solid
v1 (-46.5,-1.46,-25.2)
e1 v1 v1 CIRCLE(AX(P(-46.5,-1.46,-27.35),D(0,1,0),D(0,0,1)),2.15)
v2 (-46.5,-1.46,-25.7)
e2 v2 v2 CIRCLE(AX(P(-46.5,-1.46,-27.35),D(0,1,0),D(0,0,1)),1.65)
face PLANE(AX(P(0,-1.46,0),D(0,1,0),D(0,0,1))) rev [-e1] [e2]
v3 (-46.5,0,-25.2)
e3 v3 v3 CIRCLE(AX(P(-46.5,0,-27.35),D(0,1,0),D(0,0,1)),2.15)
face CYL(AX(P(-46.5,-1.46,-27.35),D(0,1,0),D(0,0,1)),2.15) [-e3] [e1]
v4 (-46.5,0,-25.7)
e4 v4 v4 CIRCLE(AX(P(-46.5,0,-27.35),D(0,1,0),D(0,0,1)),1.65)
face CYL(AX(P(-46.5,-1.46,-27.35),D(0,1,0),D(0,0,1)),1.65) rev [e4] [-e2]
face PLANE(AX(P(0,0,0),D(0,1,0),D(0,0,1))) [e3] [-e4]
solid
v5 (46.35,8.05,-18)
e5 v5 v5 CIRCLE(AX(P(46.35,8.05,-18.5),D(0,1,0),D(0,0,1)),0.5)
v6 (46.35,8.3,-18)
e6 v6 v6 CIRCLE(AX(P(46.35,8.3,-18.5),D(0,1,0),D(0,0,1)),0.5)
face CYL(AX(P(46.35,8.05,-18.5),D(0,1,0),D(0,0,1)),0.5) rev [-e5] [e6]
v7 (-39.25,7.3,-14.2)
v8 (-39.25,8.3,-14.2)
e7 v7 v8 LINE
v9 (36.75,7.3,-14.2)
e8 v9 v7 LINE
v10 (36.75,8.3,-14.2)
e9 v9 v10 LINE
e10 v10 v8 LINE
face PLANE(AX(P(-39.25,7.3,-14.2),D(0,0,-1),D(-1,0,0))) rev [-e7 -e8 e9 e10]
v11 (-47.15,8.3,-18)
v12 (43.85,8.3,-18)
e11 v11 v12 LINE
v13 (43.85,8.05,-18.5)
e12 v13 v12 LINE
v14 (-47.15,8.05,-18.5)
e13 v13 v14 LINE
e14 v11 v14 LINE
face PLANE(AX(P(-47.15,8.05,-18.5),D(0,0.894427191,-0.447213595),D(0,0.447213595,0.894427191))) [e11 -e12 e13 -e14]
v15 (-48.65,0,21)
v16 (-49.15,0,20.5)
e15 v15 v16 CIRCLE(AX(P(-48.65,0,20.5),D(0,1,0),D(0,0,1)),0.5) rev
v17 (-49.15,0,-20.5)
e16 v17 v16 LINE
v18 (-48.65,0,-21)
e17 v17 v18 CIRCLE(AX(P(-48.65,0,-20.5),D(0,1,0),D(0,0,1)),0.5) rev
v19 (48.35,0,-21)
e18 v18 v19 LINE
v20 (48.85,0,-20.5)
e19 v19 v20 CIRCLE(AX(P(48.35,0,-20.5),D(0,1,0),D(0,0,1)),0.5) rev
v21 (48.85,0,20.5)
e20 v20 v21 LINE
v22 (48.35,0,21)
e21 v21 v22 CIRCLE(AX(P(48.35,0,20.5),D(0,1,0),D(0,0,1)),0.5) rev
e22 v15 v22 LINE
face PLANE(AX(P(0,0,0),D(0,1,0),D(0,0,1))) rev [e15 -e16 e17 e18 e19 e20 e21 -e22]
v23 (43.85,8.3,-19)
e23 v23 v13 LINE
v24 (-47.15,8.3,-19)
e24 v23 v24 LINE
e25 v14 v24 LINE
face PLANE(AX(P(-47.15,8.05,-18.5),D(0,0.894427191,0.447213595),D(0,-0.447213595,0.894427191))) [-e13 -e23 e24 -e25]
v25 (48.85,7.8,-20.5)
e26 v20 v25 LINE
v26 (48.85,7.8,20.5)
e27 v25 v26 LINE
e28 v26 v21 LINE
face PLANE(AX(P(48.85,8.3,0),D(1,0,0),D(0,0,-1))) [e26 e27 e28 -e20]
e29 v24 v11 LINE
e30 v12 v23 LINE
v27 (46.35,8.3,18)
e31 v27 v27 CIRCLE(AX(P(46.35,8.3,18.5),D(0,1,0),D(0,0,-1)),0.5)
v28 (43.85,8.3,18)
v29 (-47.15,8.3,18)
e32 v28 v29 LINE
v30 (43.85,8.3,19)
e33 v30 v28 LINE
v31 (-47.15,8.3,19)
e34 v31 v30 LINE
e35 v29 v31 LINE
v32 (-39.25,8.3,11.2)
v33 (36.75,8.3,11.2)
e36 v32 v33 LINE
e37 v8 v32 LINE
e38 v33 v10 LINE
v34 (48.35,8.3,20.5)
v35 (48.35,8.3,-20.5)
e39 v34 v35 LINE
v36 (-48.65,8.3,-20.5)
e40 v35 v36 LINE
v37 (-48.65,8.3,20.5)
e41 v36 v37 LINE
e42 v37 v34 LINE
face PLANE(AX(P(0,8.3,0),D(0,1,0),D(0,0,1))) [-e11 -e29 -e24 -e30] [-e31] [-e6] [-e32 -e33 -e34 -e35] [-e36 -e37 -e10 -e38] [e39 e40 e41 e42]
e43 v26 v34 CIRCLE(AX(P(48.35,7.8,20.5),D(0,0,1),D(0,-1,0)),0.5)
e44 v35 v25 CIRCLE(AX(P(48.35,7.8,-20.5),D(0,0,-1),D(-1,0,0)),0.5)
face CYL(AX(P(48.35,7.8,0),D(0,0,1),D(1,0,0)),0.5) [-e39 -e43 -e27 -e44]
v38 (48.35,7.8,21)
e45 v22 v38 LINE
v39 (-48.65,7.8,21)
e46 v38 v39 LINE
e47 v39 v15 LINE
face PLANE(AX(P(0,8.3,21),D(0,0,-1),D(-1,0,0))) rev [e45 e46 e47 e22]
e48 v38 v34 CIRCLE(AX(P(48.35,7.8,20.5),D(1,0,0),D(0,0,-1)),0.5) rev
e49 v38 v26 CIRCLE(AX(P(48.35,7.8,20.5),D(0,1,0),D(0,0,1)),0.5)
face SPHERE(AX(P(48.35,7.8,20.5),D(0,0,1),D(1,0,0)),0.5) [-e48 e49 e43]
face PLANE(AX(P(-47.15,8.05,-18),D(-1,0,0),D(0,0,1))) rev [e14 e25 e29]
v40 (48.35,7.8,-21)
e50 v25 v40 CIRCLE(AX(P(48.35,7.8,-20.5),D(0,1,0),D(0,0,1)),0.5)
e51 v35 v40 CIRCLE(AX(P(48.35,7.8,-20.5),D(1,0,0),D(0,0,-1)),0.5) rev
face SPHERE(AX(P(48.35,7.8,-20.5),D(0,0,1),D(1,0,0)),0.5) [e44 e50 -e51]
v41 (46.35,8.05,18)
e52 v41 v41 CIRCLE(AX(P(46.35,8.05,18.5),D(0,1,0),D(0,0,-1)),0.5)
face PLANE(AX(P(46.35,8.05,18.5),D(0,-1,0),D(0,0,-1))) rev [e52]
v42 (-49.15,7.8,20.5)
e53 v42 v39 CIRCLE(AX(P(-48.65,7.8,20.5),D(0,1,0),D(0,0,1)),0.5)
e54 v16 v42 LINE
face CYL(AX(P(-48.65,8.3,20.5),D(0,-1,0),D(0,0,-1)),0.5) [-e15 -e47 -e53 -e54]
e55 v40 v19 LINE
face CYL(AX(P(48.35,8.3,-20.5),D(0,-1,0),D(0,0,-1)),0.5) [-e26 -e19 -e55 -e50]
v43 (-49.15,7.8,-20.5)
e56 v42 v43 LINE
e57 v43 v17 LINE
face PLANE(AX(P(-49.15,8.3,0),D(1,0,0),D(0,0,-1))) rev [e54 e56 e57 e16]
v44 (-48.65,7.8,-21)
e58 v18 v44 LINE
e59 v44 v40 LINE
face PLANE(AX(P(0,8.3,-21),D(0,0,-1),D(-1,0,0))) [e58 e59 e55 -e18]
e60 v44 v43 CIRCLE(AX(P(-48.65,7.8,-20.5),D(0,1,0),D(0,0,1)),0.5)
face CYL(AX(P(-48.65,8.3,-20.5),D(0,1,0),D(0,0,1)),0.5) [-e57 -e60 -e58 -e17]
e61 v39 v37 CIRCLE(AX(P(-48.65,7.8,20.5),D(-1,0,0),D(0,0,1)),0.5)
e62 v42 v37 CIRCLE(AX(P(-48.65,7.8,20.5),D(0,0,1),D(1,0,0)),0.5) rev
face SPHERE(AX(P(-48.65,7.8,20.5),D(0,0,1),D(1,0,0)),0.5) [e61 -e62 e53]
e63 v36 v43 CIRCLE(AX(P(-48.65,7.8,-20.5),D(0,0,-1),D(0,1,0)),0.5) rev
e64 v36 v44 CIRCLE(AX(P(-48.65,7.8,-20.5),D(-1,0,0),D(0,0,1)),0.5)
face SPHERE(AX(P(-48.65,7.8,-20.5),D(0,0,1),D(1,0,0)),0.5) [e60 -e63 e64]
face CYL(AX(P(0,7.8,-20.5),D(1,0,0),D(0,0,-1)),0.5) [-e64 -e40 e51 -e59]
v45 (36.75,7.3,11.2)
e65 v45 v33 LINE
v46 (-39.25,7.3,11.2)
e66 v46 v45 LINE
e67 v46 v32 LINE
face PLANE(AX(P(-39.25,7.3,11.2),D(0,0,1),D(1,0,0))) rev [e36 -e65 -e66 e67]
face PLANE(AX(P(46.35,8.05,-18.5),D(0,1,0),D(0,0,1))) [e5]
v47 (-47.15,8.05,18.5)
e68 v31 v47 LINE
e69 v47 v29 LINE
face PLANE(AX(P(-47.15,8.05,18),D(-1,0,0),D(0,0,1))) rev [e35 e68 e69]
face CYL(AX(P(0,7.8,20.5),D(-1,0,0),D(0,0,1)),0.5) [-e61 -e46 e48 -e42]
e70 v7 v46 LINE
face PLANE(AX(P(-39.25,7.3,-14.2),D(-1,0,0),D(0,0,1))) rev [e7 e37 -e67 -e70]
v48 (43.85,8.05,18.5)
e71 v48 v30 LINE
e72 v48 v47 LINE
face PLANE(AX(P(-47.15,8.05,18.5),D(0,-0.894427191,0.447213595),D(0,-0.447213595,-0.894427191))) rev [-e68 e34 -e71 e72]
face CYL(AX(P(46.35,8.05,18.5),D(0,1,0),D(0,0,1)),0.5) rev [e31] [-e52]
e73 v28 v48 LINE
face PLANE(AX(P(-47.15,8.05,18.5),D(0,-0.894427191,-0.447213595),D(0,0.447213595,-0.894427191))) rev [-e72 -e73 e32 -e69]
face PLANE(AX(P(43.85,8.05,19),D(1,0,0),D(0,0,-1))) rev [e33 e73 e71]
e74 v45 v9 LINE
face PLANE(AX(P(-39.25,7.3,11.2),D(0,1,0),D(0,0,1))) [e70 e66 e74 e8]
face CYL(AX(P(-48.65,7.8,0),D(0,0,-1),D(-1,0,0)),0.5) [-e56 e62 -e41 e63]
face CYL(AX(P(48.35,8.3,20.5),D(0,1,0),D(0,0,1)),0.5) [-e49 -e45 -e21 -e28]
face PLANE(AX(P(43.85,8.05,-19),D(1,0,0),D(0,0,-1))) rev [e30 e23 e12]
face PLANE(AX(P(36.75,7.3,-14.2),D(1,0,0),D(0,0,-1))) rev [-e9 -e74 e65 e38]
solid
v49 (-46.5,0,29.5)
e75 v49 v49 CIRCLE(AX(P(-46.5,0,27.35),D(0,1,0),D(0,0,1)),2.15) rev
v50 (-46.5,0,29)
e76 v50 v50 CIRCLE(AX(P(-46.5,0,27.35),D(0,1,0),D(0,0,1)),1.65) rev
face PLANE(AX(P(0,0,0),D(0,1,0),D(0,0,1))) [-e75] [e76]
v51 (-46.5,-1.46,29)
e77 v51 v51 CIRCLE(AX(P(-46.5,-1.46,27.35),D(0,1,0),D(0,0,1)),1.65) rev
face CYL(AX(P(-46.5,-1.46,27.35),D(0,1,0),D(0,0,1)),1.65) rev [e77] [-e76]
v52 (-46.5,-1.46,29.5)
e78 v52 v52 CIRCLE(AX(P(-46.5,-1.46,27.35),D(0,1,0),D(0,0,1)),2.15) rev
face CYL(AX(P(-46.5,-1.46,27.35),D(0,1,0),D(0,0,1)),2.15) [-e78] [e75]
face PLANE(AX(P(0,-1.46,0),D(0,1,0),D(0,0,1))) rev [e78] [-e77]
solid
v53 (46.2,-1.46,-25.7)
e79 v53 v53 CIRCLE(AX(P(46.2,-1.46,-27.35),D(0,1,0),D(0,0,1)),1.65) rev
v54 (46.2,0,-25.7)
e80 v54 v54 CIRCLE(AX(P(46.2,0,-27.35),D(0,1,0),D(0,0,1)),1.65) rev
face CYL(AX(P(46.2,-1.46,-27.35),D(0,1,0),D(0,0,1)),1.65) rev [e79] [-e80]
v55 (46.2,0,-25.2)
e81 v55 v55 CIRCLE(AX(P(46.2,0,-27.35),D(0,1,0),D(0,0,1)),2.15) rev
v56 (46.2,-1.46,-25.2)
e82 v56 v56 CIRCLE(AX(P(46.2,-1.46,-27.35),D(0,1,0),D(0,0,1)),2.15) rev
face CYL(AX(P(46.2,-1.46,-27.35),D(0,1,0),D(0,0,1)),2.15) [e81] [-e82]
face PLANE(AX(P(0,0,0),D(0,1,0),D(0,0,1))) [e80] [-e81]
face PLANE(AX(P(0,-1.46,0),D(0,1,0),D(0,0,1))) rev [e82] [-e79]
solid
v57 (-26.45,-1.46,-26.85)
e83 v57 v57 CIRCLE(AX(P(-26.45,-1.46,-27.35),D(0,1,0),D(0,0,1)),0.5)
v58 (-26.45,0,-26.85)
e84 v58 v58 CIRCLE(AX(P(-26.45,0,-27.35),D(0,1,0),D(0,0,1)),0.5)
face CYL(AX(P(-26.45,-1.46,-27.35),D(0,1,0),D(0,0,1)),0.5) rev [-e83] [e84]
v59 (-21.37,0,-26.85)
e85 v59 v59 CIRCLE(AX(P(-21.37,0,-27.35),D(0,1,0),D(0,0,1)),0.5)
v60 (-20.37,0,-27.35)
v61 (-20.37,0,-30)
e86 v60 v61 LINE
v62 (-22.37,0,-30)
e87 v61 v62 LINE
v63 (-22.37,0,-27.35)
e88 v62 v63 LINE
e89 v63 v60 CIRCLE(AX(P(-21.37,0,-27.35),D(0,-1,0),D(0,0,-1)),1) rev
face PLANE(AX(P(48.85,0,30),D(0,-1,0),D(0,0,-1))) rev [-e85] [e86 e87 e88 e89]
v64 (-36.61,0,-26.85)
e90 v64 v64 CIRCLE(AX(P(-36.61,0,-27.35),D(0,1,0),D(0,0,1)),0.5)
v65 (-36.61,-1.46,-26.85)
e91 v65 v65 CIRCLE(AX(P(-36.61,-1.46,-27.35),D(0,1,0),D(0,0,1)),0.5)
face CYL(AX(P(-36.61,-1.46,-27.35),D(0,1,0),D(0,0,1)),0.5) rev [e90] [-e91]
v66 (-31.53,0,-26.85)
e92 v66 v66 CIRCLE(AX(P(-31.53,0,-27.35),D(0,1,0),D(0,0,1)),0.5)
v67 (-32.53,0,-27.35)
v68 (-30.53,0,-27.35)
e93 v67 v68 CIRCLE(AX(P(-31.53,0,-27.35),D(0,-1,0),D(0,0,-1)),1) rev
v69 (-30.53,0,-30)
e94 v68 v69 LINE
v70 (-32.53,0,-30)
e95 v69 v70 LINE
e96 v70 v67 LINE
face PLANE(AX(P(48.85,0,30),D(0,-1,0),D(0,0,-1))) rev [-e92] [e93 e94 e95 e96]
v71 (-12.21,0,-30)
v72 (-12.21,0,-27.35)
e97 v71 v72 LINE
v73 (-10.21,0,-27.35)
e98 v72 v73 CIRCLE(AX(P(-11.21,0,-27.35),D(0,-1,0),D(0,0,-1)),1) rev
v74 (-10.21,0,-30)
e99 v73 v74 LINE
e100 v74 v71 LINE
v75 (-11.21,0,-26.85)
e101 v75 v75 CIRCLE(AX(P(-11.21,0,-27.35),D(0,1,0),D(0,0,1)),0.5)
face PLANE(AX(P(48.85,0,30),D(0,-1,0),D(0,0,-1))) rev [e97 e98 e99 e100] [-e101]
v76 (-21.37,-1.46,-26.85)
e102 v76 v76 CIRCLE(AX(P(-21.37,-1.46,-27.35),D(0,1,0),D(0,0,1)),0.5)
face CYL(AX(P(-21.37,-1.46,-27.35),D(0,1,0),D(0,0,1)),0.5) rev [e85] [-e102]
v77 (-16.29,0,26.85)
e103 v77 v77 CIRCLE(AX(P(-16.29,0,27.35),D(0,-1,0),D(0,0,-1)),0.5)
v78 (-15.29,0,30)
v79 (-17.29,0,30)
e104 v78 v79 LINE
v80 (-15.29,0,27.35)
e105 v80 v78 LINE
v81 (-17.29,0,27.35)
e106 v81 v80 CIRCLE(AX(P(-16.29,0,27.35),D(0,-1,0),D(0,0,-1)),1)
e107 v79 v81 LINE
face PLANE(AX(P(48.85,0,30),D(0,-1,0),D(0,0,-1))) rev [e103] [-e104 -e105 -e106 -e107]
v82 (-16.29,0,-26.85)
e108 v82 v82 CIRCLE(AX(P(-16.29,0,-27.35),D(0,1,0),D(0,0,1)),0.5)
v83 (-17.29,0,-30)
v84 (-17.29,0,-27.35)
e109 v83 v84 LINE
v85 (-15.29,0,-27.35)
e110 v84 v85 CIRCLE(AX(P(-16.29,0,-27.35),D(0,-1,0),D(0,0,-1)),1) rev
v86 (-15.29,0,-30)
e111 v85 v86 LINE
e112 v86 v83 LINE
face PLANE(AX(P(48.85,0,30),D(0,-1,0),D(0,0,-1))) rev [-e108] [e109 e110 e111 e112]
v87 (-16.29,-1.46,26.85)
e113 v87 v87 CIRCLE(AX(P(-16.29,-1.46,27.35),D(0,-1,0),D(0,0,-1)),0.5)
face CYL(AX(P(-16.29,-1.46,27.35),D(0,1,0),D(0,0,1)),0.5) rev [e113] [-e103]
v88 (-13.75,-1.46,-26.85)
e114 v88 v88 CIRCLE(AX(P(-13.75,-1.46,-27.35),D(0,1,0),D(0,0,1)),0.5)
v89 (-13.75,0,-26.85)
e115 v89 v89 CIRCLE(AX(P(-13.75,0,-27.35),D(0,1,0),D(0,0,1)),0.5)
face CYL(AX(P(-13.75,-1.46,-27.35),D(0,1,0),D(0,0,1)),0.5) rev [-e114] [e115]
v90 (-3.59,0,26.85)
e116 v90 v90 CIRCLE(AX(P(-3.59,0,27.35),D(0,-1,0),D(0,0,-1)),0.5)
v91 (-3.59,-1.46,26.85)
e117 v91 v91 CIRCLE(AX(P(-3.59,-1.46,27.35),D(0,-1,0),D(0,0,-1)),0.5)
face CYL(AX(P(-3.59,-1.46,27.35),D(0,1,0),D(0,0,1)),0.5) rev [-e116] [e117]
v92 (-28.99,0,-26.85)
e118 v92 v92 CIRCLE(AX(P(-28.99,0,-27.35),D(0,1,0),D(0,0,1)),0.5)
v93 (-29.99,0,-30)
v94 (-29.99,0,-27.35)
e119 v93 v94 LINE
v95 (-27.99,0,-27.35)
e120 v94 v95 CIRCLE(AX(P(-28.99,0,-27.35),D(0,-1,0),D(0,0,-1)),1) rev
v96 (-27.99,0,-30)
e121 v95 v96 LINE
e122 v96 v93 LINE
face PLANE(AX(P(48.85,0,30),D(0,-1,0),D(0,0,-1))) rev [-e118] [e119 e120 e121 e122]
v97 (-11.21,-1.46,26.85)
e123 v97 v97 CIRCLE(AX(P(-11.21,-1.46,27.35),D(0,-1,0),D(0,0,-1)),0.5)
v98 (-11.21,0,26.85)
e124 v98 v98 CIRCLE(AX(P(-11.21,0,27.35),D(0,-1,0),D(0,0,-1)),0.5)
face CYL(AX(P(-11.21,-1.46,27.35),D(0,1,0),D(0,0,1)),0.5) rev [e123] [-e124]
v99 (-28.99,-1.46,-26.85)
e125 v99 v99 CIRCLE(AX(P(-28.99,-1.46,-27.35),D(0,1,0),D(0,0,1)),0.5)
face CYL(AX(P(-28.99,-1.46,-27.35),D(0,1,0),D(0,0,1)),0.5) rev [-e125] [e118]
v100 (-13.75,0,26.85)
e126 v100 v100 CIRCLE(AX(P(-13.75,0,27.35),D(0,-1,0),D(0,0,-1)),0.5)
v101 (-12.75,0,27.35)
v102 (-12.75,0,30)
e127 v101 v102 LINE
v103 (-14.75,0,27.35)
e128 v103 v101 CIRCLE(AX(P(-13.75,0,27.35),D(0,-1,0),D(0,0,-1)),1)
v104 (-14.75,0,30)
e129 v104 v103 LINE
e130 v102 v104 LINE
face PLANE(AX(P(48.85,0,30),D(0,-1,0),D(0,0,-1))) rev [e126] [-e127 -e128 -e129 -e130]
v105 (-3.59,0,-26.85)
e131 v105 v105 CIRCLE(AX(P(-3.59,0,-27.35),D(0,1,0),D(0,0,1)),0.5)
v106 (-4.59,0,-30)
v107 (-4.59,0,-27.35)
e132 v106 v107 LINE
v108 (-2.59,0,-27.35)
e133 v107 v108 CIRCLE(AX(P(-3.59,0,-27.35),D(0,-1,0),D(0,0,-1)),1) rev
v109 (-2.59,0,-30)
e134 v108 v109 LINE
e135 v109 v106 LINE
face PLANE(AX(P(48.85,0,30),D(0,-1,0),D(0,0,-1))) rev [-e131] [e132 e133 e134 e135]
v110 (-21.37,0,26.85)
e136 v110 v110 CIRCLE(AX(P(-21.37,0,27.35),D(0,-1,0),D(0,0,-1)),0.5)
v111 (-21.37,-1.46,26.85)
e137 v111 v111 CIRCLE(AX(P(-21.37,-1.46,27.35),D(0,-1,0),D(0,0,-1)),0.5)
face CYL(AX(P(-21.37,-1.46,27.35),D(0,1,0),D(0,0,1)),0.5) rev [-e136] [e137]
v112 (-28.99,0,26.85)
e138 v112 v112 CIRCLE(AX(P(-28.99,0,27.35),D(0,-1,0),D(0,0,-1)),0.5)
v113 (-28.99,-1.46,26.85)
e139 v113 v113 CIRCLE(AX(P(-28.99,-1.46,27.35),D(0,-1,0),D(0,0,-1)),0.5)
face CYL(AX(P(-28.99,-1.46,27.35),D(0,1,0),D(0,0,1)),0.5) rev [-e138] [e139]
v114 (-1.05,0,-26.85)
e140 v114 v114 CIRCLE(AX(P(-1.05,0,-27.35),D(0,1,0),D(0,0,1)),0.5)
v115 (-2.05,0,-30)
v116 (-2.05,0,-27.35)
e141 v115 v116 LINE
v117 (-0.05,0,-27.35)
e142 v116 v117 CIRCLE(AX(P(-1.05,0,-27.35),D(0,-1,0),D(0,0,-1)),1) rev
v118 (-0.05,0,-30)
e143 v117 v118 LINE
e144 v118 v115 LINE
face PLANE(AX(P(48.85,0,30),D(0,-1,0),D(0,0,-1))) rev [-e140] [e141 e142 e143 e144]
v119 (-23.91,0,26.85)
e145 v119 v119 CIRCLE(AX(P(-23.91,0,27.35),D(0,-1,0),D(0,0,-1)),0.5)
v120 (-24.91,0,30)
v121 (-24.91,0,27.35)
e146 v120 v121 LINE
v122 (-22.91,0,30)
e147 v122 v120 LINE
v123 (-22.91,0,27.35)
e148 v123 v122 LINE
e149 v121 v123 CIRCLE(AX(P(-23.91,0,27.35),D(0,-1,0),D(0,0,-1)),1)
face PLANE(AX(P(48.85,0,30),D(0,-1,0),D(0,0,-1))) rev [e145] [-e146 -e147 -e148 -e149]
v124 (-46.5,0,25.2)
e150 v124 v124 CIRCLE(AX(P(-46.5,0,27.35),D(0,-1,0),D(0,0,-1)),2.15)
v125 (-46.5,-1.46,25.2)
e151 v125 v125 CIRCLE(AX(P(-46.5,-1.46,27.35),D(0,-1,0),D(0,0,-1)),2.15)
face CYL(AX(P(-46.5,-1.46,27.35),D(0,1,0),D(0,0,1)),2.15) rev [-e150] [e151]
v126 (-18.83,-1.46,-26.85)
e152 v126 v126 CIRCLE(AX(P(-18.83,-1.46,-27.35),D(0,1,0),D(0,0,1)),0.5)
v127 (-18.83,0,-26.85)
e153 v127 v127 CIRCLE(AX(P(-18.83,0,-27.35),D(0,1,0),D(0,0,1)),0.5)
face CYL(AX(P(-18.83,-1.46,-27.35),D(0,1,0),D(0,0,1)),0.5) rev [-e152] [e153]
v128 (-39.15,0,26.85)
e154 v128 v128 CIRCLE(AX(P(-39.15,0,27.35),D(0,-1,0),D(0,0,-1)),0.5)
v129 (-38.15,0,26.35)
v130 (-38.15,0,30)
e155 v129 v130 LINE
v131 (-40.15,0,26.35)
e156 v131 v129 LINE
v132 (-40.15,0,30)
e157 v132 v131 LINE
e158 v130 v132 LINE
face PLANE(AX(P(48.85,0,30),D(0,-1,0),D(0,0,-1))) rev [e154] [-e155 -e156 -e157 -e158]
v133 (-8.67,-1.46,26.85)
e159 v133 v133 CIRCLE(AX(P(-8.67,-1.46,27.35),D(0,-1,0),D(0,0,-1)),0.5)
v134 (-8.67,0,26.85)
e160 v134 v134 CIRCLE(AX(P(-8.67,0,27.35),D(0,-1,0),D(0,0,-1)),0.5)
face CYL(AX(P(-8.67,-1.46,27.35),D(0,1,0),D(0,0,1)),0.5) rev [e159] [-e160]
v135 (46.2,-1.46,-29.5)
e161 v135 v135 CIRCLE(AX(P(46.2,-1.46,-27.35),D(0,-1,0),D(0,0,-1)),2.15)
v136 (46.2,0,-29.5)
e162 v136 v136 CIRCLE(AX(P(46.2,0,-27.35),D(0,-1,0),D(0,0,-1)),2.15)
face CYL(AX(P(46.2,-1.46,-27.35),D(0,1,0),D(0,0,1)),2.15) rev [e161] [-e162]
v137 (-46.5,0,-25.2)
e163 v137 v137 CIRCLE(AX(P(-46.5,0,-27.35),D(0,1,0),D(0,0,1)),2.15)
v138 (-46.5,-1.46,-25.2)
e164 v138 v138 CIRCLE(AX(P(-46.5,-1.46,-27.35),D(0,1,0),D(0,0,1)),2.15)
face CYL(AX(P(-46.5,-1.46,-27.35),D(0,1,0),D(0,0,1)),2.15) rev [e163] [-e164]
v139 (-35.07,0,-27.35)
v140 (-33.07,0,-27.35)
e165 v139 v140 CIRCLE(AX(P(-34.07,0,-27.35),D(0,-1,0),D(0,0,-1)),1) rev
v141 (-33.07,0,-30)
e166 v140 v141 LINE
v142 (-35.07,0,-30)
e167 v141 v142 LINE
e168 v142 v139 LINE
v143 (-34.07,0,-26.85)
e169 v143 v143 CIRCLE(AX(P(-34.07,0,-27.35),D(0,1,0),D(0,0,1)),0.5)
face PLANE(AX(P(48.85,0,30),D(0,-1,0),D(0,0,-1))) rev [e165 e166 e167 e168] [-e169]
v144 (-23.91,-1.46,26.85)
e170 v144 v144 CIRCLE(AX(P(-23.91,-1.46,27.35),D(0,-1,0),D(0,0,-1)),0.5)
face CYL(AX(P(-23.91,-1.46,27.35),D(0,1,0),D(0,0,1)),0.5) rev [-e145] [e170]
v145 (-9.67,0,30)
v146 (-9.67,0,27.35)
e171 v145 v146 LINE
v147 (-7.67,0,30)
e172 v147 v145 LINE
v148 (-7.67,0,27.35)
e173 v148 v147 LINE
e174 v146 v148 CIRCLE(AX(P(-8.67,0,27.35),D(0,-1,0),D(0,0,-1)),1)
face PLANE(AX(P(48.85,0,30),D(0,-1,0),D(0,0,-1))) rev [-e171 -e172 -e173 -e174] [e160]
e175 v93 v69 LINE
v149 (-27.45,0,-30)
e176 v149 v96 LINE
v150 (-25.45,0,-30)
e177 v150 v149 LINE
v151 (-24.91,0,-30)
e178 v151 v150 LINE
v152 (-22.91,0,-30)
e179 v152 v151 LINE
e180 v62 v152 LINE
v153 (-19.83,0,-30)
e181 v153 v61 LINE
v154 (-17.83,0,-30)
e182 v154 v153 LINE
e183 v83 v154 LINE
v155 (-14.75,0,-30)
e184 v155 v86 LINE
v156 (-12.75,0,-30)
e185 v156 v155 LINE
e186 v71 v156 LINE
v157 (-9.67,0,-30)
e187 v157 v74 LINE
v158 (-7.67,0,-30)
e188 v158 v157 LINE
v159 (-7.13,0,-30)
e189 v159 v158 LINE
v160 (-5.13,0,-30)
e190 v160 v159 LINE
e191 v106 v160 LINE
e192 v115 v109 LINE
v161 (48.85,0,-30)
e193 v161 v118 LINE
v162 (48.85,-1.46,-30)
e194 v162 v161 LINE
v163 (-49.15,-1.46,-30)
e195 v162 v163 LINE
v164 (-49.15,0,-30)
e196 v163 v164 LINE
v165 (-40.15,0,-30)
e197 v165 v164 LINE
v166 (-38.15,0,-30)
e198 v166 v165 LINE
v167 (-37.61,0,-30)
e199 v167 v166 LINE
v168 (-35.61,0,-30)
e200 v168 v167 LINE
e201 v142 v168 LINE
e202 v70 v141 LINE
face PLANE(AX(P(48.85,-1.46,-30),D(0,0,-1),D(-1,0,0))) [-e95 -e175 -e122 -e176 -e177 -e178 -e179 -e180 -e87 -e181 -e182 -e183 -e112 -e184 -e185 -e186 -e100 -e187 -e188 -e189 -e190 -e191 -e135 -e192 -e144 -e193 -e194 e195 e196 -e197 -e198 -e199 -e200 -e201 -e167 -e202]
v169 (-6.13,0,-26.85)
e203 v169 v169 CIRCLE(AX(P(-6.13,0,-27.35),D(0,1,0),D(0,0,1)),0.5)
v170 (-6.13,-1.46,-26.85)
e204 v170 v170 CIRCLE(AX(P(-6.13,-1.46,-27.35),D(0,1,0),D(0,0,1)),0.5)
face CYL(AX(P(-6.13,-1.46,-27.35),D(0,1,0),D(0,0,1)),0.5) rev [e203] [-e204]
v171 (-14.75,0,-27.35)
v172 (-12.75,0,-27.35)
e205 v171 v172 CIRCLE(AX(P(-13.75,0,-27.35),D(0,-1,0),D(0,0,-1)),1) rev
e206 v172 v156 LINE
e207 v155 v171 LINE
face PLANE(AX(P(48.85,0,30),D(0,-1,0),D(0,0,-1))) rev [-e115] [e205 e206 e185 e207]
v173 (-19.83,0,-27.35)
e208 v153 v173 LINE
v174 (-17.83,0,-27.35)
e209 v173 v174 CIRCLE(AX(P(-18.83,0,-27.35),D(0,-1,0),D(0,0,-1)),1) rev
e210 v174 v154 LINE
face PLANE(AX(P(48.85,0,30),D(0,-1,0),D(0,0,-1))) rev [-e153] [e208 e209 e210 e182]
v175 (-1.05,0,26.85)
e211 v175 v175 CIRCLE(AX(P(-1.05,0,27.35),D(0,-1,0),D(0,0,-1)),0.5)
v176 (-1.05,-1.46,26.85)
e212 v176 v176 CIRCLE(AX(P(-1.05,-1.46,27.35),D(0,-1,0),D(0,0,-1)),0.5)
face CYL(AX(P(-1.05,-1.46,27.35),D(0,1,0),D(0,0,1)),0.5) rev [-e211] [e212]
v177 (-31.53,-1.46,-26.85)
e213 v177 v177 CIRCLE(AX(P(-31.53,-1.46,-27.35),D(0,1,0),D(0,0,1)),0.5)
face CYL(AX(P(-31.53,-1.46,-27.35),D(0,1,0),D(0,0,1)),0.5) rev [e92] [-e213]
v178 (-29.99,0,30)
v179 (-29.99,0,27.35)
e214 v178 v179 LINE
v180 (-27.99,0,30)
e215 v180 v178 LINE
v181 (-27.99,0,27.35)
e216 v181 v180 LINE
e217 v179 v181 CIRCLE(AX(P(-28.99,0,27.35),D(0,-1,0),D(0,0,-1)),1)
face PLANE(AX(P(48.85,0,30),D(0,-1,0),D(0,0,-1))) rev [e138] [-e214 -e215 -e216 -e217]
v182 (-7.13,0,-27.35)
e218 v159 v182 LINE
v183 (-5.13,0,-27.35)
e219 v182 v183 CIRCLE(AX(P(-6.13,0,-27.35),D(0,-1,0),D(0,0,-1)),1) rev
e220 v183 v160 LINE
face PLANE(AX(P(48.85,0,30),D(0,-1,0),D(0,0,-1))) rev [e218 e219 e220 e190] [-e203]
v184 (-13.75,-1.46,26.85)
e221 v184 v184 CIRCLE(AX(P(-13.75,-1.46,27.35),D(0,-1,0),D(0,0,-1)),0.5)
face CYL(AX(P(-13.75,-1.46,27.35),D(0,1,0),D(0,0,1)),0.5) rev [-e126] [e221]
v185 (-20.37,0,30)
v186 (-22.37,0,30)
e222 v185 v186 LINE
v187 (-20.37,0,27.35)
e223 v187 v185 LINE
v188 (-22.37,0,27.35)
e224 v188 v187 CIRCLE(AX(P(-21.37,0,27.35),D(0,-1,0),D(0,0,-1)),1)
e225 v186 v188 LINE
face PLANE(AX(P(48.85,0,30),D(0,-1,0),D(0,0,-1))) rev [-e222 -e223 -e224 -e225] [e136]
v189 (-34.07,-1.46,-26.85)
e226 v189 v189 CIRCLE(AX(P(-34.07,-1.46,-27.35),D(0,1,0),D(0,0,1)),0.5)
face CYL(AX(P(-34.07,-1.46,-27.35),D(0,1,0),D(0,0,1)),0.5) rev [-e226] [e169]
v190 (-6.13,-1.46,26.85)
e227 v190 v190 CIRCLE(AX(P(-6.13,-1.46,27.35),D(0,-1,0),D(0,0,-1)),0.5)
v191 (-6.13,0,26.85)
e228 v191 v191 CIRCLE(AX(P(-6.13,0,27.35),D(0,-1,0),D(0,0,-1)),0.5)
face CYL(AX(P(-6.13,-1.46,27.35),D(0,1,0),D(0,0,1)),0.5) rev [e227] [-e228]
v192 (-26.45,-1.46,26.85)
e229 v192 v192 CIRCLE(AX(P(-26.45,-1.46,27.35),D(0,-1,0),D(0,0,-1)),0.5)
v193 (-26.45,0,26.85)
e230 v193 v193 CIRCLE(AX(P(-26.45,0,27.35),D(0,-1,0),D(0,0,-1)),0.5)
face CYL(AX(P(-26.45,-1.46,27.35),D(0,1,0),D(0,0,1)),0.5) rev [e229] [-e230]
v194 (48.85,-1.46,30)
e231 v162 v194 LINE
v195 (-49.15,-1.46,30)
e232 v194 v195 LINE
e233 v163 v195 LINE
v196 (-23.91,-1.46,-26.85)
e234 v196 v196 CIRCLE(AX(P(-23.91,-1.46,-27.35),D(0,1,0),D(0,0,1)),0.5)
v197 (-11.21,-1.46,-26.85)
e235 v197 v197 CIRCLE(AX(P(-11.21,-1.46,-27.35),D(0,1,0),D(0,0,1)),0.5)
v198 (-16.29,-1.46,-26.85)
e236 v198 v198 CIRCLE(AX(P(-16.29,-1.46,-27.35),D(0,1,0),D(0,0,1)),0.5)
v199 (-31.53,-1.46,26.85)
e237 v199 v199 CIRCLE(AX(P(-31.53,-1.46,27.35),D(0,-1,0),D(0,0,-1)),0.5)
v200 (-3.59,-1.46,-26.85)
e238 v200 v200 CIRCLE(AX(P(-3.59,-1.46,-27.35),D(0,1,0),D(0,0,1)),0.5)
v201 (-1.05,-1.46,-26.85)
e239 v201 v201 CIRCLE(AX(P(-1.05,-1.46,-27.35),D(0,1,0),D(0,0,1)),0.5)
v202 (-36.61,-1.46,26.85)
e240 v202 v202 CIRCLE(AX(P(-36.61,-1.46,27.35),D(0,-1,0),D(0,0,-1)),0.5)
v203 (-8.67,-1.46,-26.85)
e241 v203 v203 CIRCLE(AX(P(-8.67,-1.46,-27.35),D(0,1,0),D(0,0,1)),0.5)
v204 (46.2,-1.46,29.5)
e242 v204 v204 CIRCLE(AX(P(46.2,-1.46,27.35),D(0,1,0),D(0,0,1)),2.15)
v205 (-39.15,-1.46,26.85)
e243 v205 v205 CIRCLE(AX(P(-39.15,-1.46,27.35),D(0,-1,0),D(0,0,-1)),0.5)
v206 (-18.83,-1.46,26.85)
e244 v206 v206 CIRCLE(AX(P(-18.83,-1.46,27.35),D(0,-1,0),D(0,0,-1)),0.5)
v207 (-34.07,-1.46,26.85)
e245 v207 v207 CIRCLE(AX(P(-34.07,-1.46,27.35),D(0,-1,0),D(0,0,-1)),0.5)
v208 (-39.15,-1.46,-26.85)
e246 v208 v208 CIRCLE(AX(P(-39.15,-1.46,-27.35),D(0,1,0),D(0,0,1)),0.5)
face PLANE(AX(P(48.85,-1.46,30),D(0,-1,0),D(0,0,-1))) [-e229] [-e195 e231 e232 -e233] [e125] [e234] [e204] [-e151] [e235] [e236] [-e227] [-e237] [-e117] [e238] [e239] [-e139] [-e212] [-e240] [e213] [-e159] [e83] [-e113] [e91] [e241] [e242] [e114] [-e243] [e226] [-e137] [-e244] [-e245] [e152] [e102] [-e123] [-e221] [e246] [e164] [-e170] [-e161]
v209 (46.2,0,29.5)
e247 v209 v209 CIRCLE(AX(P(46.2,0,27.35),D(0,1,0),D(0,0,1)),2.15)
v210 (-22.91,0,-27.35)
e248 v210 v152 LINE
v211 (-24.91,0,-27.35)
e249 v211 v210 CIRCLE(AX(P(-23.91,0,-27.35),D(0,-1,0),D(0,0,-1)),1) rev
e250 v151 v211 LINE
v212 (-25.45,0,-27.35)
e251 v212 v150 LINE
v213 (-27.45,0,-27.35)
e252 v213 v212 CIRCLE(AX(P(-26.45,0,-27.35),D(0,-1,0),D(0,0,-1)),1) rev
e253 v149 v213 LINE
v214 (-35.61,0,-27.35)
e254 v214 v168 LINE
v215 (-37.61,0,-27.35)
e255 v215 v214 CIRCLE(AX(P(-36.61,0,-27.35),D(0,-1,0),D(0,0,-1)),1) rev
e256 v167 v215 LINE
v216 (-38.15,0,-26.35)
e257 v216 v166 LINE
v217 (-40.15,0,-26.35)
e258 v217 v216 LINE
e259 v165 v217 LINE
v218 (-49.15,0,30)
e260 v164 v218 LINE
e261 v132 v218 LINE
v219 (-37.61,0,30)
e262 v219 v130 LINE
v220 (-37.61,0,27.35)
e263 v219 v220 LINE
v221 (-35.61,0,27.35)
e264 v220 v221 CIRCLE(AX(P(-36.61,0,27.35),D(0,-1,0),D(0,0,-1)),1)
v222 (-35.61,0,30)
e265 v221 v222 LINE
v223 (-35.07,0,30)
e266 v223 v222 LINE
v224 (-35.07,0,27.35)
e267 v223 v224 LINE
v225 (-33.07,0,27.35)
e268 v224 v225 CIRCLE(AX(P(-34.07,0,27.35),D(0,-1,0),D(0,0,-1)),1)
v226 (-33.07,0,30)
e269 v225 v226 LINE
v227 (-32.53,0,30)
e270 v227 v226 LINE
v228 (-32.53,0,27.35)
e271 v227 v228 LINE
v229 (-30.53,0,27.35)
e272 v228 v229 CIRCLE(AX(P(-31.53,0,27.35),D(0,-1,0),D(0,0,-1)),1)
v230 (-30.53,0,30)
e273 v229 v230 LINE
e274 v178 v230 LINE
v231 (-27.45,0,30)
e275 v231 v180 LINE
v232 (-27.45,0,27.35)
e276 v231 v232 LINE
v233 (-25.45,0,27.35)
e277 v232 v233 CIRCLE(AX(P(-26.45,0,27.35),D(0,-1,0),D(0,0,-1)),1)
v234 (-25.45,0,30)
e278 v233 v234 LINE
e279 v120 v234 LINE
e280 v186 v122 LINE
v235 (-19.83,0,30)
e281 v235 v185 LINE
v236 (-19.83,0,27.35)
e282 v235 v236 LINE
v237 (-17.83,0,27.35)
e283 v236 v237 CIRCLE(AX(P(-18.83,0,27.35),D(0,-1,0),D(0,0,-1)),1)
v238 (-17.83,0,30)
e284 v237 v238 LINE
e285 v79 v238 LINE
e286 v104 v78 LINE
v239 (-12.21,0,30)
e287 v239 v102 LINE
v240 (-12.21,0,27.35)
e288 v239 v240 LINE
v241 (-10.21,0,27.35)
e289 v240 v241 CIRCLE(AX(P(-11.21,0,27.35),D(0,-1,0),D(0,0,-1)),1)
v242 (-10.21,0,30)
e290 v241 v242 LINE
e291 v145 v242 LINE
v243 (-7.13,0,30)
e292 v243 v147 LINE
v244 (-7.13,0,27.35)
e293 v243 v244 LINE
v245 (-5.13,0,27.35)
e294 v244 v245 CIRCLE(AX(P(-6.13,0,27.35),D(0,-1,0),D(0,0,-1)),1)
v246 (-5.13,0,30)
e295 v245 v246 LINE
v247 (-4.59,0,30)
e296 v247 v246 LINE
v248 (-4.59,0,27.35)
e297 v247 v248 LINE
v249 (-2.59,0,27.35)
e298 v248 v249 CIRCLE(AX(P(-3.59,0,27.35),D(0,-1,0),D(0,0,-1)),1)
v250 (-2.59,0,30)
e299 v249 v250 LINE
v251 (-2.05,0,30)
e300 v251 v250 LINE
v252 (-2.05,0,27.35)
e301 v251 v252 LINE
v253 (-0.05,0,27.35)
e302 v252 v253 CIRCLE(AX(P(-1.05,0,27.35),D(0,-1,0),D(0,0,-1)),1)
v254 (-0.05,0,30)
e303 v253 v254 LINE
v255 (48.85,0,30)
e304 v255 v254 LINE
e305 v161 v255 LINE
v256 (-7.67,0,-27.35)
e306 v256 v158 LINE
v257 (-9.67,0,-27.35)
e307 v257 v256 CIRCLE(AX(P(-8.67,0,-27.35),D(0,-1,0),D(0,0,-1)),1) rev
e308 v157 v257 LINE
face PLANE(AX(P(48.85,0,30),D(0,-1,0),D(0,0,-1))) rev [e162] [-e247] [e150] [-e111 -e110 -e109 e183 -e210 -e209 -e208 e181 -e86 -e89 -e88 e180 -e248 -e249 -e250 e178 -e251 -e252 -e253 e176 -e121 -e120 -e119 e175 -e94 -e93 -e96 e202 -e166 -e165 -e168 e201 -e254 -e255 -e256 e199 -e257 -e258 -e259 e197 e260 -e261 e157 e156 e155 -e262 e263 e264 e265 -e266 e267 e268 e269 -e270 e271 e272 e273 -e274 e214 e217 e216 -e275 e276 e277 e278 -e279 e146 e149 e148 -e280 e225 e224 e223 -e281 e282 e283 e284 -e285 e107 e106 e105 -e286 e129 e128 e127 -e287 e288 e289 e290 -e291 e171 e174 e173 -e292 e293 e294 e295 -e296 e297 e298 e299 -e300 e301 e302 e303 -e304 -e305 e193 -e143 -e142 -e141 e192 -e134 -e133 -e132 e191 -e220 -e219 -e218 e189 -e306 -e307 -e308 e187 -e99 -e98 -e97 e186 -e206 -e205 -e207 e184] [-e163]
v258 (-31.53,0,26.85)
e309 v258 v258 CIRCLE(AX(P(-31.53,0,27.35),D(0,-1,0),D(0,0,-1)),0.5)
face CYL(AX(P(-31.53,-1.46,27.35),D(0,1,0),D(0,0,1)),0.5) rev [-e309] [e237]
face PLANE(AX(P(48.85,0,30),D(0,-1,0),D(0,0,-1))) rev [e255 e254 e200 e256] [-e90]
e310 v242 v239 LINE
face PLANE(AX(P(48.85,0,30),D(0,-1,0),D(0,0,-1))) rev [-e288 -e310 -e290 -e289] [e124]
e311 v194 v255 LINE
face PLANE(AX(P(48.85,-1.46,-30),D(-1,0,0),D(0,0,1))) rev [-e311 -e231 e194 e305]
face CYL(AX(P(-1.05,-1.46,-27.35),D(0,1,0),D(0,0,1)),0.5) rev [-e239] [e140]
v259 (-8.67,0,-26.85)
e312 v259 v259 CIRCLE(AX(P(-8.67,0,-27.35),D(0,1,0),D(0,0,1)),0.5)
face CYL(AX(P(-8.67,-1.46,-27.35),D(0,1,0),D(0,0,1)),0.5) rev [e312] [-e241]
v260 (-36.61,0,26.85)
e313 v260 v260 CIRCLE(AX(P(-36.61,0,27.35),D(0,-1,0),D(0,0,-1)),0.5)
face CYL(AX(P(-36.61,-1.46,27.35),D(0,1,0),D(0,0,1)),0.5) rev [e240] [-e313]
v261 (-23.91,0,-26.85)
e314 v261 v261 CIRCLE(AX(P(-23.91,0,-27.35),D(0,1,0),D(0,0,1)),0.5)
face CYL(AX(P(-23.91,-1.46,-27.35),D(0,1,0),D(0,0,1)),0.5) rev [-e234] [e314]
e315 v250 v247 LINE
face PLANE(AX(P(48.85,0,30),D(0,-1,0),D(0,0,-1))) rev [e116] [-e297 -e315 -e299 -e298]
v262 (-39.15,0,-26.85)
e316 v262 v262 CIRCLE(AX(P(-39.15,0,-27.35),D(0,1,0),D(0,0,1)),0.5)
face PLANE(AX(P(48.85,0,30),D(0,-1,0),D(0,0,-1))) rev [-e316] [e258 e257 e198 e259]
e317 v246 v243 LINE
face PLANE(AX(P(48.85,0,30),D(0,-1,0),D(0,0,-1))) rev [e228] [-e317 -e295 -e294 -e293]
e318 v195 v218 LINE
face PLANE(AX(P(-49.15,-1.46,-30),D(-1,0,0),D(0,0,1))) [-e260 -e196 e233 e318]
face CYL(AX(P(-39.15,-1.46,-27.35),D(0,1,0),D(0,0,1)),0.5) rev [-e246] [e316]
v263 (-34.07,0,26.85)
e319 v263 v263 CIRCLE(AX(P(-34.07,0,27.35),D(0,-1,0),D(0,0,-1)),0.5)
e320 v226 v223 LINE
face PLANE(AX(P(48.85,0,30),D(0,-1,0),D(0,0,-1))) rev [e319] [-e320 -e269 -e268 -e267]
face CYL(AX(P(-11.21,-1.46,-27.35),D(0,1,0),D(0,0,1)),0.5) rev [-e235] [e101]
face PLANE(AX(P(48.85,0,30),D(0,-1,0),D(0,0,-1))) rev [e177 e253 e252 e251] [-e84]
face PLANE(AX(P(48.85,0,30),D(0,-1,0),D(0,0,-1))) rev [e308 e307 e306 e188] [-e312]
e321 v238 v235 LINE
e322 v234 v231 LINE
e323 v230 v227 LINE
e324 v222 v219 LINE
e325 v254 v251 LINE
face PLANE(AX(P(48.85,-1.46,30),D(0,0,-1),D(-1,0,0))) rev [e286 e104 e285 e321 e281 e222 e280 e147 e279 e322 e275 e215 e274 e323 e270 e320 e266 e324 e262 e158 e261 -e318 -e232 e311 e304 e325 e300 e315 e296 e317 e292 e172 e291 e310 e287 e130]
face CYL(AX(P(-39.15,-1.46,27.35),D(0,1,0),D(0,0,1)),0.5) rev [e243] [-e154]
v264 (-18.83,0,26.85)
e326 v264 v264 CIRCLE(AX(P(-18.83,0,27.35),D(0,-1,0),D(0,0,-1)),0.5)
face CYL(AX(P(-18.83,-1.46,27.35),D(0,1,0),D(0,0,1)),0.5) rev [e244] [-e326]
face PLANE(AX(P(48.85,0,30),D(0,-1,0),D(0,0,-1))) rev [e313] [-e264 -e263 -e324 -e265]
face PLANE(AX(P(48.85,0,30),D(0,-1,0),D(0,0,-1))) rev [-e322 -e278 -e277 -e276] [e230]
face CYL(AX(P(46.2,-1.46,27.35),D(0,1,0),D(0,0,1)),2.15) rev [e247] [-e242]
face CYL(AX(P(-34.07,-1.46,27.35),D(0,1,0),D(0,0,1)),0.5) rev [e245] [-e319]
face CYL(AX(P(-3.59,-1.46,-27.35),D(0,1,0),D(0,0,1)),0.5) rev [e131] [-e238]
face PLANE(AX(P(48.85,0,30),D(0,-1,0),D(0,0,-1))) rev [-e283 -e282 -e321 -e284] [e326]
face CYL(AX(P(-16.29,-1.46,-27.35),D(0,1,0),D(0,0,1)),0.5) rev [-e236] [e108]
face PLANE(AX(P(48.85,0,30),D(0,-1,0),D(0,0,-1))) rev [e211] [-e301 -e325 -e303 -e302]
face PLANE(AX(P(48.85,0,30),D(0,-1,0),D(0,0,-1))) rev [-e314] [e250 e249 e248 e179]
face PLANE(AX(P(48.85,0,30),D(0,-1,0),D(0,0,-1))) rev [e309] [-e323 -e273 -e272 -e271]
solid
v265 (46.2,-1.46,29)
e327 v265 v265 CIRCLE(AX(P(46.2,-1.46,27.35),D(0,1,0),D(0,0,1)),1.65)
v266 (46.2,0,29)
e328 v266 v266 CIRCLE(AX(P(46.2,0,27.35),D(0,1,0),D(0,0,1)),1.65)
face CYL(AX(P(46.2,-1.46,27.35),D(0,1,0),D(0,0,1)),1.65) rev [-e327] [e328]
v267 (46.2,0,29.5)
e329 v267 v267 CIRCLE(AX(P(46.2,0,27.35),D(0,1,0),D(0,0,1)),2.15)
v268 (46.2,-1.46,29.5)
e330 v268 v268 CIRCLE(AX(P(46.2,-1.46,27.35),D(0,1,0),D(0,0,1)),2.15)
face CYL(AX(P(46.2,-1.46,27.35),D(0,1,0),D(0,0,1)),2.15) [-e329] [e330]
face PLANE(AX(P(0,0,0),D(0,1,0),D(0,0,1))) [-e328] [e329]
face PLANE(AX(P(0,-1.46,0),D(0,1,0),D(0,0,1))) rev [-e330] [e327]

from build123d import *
from OCP.BRepFilletAPI import BRepFilletAPI_MakeChamfer

# Parameters (mm, degrees)
SKETCH1_W             = 98
SKETCH1_H             = 60
BOSS_EXTRUDE1_DEPTH   = 1.46
SKETCH1_3_R           = 2.15
CUT_EXTRUDE1_DEPTH    = 58.600816834
SKETCH1_4_R           = 2.15
SKETCH1_4_R_2         = 1.65
BOSS_EXTRUDE2_DEPTH   = 1.46
BOSS_EXTRUDE2_2_DEPTH = 1.46
BOSS_EXTRUDE2_3_DEPTH = 1.46
BOSS_EXTRUDE2_4_DEPTH = 1.46
SKETCH1_5_W           = 98
SKETCH1_5_H           = 42
BOSS_EXTRUDE3_DEPTH   = 8.3
SKETCH2_W             = 76
SKETCH2_H             = 25.4
CUT_EXTRUDE2_DEPTH    = 1
SKETCH3_R             = 0.5
SKETCH3_W             = 91
SKETCH3_H             = 1
CUT_EXTRUDE3_DEPTH    = 0.25
CHAMFER1_SIZE         = 0.25
CHAMFER1_SIZE_2       = 0.5
FILLET1_R             = 0.5
SKETCH4_7_R           = 0.5
CUT_EXTRUDE9_DEPTH    = 59.177422597


with BuildPart() as part:
    # Sketch1 → Boss-Extrude1 (new body)
    with BuildSketch(Plane(origin=(0, 0, 0), x_dir=(1, 0, 0), z_dir=(0, 1, 0))):
        with Locations((-0.15, 0)):
            Rectangle(SKETCH1_W, SKETCH1_H)
    extrude(amount=-BOSS_EXTRUDE1_DEPTH)

    # Sketch1<3> → Cut-Extrude1 (cut, through all)
    with BuildSketch(Plane(origin=(0, 0, 0), x_dir=(1, 0, 0), z_dir=(0, 1, 0))):
        with Locations(Location((-46.5, 27.35, 0), (0, 0, 270))):
            Circle(SKETCH1_3_R)
        with Locations(Location((46.2, 27.35, 0), (0, 0, 90))):
            Circle(SKETCH1_3_R)
        with Locations(Location((46.2, -27.35, 0), (0, 0, 270))):
            Circle(SKETCH1_3_R)
        with Locations(Location((-46.5, -27.35, 0), (0, 0, 90))):
            Circle(SKETCH1_3_R)
    extrude(amount=-CUT_EXTRUDE1_DEPTH, mode=Mode.SUBTRACT)

    # Sketch4<7> → Cut-Extrude9 (cut, through all)
    with BuildSketch(Plane(origin=(0, 0, 0), x_dir=(1, 0, 0), z_dir=(0, 1, 0))):
        with Locations(Location((-39.15, 27.35, 0), (0, 0, 270))):
            Circle(SKETCH4_7_R)
        with Locations(Location((-36.61, 27.35, 0), (0, 0, 270))):
            Circle(SKETCH4_7_R)
        with Locations(Location((-34.07, 27.35, 0), (0, 0, 270))):
            Circle(SKETCH4_7_R)
        with Locations(Location((-31.53, 27.35, 0), (0, 0, 270))):
            Circle(SKETCH4_7_R)
        with Locations(Location((-28.99, 27.35, 0), (0, 0, 270))):
            Circle(SKETCH4_7_R)
        with Locations(Location((-26.45, 27.35, 0), (0, 0, 270))):
            Circle(SKETCH4_7_R)
        with Locations(Location((-23.91, 27.35, 0), (0, 0, 270))):
            Circle(SKETCH4_7_R)
        with Locations(Location((-21.37, 27.35, 0), (0, 0, 270))):
            Circle(SKETCH4_7_R)
        with Locations(Location((-18.83, 27.35, 0), (0, 0, 270))):
            Circle(SKETCH4_7_R)
        with Locations(Location((-16.29, 27.35, 0), (0, 0, 270))):
            Circle(SKETCH4_7_R)
        with Locations(Location((-13.75, 27.35, 0), (0, 0, 270))):
            Circle(SKETCH4_7_R)
        with Locations(Location((-11.21, 27.35, 0), (0, 0, 270))):
            Circle(SKETCH4_7_R)
        with Locations(Location((-8.67, 27.35, 0), (0, 0, 270))):
            Circle(SKETCH4_7_R)
        with Locations(Location((-6.13, 27.35, 0), (0, 0, 270))):
            Circle(SKETCH4_7_R)
        with Locations(Location((-3.59, 27.35, 0), (0, 0, 270))):
            Circle(SKETCH4_7_R)
        with Locations(Location((-1.05, 27.35, 0), (0, 0, 270))):
            Circle(SKETCH4_7_R)
    cut_extrude9 = extrude(amount=-CUT_EXTRUDE9_DEPTH, mode=Mode.SUBTRACT)

    # Mirror1: Cut-Extrude9 across plane
    add(cut_extrude9.mirror(Plane.XY), mode=Mode.SUBTRACT)


with BuildPart() as body_2:
    # Sketch1<4> → Boss-Extrude2 (new body)
    with BuildSketch(Plane(origin=(0, 0, 0), x_dir=(1, 0, 0), z_dir=(0, 1, 0))):
        with Locations(Location((-46.5, 27.35, 0), (0, 0, 270))):
            Circle(SKETCH1_4_R)
        with Locations(Location((-46.5, 27.35, 0), (0, 0, 270))):
            Circle(SKETCH1_4_R_2, mode=Mode.SUBTRACT)
    extrude(amount=-BOSS_EXTRUDE2_DEPTH)


with BuildPart() as body_3:
    # Sketch1<4> → Boss-Extrude2 2 (new body)
    with BuildSketch(Plane(origin=(0, 0, 0), x_dir=(1, 0, 0), z_dir=(0, 1, 0))):
        with Locations(Location((46.2, 27.35, 0), (0, 0, 270))):
            Circle(SKETCH1_4_R)
        with Locations(Location((46.2, 27.35, 0), (0, 0, 270))):
            Circle(SKETCH1_4_R_2, mode=Mode.SUBTRACT)
    extrude(amount=-BOSS_EXTRUDE2_2_DEPTH)


with BuildPart() as body_4:
    # Sketch1<4> → Boss-Extrude2 3 (new body)
    with BuildSketch(Plane(origin=(0, 0, 0), x_dir=(1, 0, 0), z_dir=(0, 1, 0))):
        with Locations(Location((46.2, -27.35, 0), (0, 0, 270))):
            Circle(SKETCH1_4_R)
        with Locations(Location((46.2, -27.35, 0), (0, 0, 270))):
            Circle(SKETCH1_4_R_2, mode=Mode.SUBTRACT)
    extrude(amount=-BOSS_EXTRUDE2_3_DEPTH)


with BuildPart() as body_5:
    # Sketch1<4> → Boss-Extrude2 4 (new body)
    with BuildSketch(Plane(origin=(0, 0, 0), x_dir=(1, 0, 0), z_dir=(0, 1, 0))):
        with Locations(Location((-46.5, -27.35, 0), (0, 0, 270))):
            Circle(SKETCH1_4_R)
        with Locations(Location((-46.5, -27.35, 0), (0, 0, 270))):
            Circle(SKETCH1_4_R_2, mode=Mode.SUBTRACT)
    extrude(amount=-BOSS_EXTRUDE2_4_DEPTH)


with BuildPart() as body_6:
    # Sketch1<5> → Boss-Extrude3 (new body)
    with BuildSketch(Plane(origin=(0, 0, 0), x_dir=(1, 0, 0), z_dir=(0, 1, 0))):
        with Locations((-0.15, 0)):
            Rectangle(SKETCH1_5_W, SKETCH1_5_H)
    extrude(amount=BOSS_EXTRUDE3_DEPTH)

    # Sketch2 → Cut-Extrude2 (cut)
    with BuildSketch(Plane(origin=(0, 8.3, 0), x_dir=(-1, 0, 0), z_dir=(0, 1, 0))):
        with Locations((1.25, -1.5)):
            Rectangle(SKETCH2_W, SKETCH2_H)
    extrude(amount=-CUT_EXTRUDE2_DEPTH, mode=Mode.SUBTRACT)

    # Sketch3 → Cut-Extrude3 (cut)
    with BuildSketch(Plane(origin=(0, 8.3, 0), x_dir=(1, 0, 0), z_dir=(0, 1, 0))):
        with Locations(Location((46.35, 18.5, 0), (0, 0, 270))):
            Circle(SKETCH3_R)
        with Locations(Location((46.35, -18.5, 0), (0, 0, 90))):
            Circle(SKETCH3_R)
        with Locations((-1.65, 18.5)):
            Rectangle(SKETCH3_W, SKETCH3_H)
        with Locations((-1.65, -18.5)):
            Rectangle(SKETCH3_W, SKETCH3_H)
    extrude(amount=-CUT_EXTRUDE3_DEPTH, mode=Mode.SUBTRACT)

    # Chamfer1
    chamfer1_edges_1 = [body_6.edges().sort_by_distance(p)[0] for p in [
        (-1.65, 8.05, 19),
    ]]
    chamfer1_side_1 = [body_6.faces().sort_by_distance(p)[0] for p in [
        (-1.65, 8.055, 19),
    ]]
    chamfer1_edges_2 = [body_6.edges().sort_by_distance(p)[0] for p in [
        (-1.65, 8.05, 18),
    ]]
    chamfer1_side_2 = [body_6.faces().sort_by_distance(p)[0] for p in [
        (-1.65, 8.055, 18),
    ]]
    chamfer1_edges_3 = [body_6.edges().sort_by_distance(p)[0] for p in [
        (-1.65, 8.05, -18),
    ]]
    chamfer1_side_3 = [body_6.faces().sort_by_distance(p)[0] for p in [
        (-1.65, 8.055, -18),
    ]]
    chamfer1_edges_4 = [body_6.edges().sort_by_distance(p)[0] for p in [
        (-1.65, 8.05, -19),
    ]]
    chamfer1_side_4 = [body_6.faces().sort_by_distance(p)[0] for p in [
        (-1.65, 8.055, -19),
    ]]
    chamfer1 = BRepFilletAPI_MakeChamfer(body_6.part.solid().wrapped)
    for e in chamfer1_edges_1:
        chamfer1.Add(CHAMFER1_SIZE - 0.0001, CHAMFER1_SIZE_2 - 0.0001, e.wrapped, chamfer1_side_1[0].wrapped)
    for e in chamfer1_edges_2:
        chamfer1.Add(CHAMFER1_SIZE - 0.0001, CHAMFER1_SIZE_2 - 0.0001, e.wrapped, chamfer1_side_2[0].wrapped)
    for e in chamfer1_edges_3:
        chamfer1.Add(CHAMFER1_SIZE - 0.0001, CHAMFER1_SIZE_2 - 0.0001, e.wrapped, chamfer1_side_3[0].wrapped)
    for e in chamfer1_edges_4:
        chamfer1.Add(CHAMFER1_SIZE - 0.0001, CHAMFER1_SIZE_2 - 0.0001, e.wrapped, chamfer1_side_4[0].wrapped)
    add(Compound.cast(chamfer1.Shape()), mode=Mode.REPLACE)  # a hair under: the kernel refuses the full size

    # Fillet1
    fillet1_edges = [body_6.edges().sort_by_distance(p)[0] for p in [
        (-0.15, 8.3, 21),
        (48.85, 8.3, 0),
        (-0.15, 8.3, -21),
        (-49.15, 8.3, 0),
        (-49.15, 4.15, -21),
        (48.85, 4.15, -21),
        (48.85, 4.15, 21),
        (-49.15, 4.15, 21),
    ]]
    fillet(fillet1_edges, radius=FILLET1_R)


solid = Compound([part.part, body_2.part, body_3.part, body_4.part, body_5.part, body_6.part])
